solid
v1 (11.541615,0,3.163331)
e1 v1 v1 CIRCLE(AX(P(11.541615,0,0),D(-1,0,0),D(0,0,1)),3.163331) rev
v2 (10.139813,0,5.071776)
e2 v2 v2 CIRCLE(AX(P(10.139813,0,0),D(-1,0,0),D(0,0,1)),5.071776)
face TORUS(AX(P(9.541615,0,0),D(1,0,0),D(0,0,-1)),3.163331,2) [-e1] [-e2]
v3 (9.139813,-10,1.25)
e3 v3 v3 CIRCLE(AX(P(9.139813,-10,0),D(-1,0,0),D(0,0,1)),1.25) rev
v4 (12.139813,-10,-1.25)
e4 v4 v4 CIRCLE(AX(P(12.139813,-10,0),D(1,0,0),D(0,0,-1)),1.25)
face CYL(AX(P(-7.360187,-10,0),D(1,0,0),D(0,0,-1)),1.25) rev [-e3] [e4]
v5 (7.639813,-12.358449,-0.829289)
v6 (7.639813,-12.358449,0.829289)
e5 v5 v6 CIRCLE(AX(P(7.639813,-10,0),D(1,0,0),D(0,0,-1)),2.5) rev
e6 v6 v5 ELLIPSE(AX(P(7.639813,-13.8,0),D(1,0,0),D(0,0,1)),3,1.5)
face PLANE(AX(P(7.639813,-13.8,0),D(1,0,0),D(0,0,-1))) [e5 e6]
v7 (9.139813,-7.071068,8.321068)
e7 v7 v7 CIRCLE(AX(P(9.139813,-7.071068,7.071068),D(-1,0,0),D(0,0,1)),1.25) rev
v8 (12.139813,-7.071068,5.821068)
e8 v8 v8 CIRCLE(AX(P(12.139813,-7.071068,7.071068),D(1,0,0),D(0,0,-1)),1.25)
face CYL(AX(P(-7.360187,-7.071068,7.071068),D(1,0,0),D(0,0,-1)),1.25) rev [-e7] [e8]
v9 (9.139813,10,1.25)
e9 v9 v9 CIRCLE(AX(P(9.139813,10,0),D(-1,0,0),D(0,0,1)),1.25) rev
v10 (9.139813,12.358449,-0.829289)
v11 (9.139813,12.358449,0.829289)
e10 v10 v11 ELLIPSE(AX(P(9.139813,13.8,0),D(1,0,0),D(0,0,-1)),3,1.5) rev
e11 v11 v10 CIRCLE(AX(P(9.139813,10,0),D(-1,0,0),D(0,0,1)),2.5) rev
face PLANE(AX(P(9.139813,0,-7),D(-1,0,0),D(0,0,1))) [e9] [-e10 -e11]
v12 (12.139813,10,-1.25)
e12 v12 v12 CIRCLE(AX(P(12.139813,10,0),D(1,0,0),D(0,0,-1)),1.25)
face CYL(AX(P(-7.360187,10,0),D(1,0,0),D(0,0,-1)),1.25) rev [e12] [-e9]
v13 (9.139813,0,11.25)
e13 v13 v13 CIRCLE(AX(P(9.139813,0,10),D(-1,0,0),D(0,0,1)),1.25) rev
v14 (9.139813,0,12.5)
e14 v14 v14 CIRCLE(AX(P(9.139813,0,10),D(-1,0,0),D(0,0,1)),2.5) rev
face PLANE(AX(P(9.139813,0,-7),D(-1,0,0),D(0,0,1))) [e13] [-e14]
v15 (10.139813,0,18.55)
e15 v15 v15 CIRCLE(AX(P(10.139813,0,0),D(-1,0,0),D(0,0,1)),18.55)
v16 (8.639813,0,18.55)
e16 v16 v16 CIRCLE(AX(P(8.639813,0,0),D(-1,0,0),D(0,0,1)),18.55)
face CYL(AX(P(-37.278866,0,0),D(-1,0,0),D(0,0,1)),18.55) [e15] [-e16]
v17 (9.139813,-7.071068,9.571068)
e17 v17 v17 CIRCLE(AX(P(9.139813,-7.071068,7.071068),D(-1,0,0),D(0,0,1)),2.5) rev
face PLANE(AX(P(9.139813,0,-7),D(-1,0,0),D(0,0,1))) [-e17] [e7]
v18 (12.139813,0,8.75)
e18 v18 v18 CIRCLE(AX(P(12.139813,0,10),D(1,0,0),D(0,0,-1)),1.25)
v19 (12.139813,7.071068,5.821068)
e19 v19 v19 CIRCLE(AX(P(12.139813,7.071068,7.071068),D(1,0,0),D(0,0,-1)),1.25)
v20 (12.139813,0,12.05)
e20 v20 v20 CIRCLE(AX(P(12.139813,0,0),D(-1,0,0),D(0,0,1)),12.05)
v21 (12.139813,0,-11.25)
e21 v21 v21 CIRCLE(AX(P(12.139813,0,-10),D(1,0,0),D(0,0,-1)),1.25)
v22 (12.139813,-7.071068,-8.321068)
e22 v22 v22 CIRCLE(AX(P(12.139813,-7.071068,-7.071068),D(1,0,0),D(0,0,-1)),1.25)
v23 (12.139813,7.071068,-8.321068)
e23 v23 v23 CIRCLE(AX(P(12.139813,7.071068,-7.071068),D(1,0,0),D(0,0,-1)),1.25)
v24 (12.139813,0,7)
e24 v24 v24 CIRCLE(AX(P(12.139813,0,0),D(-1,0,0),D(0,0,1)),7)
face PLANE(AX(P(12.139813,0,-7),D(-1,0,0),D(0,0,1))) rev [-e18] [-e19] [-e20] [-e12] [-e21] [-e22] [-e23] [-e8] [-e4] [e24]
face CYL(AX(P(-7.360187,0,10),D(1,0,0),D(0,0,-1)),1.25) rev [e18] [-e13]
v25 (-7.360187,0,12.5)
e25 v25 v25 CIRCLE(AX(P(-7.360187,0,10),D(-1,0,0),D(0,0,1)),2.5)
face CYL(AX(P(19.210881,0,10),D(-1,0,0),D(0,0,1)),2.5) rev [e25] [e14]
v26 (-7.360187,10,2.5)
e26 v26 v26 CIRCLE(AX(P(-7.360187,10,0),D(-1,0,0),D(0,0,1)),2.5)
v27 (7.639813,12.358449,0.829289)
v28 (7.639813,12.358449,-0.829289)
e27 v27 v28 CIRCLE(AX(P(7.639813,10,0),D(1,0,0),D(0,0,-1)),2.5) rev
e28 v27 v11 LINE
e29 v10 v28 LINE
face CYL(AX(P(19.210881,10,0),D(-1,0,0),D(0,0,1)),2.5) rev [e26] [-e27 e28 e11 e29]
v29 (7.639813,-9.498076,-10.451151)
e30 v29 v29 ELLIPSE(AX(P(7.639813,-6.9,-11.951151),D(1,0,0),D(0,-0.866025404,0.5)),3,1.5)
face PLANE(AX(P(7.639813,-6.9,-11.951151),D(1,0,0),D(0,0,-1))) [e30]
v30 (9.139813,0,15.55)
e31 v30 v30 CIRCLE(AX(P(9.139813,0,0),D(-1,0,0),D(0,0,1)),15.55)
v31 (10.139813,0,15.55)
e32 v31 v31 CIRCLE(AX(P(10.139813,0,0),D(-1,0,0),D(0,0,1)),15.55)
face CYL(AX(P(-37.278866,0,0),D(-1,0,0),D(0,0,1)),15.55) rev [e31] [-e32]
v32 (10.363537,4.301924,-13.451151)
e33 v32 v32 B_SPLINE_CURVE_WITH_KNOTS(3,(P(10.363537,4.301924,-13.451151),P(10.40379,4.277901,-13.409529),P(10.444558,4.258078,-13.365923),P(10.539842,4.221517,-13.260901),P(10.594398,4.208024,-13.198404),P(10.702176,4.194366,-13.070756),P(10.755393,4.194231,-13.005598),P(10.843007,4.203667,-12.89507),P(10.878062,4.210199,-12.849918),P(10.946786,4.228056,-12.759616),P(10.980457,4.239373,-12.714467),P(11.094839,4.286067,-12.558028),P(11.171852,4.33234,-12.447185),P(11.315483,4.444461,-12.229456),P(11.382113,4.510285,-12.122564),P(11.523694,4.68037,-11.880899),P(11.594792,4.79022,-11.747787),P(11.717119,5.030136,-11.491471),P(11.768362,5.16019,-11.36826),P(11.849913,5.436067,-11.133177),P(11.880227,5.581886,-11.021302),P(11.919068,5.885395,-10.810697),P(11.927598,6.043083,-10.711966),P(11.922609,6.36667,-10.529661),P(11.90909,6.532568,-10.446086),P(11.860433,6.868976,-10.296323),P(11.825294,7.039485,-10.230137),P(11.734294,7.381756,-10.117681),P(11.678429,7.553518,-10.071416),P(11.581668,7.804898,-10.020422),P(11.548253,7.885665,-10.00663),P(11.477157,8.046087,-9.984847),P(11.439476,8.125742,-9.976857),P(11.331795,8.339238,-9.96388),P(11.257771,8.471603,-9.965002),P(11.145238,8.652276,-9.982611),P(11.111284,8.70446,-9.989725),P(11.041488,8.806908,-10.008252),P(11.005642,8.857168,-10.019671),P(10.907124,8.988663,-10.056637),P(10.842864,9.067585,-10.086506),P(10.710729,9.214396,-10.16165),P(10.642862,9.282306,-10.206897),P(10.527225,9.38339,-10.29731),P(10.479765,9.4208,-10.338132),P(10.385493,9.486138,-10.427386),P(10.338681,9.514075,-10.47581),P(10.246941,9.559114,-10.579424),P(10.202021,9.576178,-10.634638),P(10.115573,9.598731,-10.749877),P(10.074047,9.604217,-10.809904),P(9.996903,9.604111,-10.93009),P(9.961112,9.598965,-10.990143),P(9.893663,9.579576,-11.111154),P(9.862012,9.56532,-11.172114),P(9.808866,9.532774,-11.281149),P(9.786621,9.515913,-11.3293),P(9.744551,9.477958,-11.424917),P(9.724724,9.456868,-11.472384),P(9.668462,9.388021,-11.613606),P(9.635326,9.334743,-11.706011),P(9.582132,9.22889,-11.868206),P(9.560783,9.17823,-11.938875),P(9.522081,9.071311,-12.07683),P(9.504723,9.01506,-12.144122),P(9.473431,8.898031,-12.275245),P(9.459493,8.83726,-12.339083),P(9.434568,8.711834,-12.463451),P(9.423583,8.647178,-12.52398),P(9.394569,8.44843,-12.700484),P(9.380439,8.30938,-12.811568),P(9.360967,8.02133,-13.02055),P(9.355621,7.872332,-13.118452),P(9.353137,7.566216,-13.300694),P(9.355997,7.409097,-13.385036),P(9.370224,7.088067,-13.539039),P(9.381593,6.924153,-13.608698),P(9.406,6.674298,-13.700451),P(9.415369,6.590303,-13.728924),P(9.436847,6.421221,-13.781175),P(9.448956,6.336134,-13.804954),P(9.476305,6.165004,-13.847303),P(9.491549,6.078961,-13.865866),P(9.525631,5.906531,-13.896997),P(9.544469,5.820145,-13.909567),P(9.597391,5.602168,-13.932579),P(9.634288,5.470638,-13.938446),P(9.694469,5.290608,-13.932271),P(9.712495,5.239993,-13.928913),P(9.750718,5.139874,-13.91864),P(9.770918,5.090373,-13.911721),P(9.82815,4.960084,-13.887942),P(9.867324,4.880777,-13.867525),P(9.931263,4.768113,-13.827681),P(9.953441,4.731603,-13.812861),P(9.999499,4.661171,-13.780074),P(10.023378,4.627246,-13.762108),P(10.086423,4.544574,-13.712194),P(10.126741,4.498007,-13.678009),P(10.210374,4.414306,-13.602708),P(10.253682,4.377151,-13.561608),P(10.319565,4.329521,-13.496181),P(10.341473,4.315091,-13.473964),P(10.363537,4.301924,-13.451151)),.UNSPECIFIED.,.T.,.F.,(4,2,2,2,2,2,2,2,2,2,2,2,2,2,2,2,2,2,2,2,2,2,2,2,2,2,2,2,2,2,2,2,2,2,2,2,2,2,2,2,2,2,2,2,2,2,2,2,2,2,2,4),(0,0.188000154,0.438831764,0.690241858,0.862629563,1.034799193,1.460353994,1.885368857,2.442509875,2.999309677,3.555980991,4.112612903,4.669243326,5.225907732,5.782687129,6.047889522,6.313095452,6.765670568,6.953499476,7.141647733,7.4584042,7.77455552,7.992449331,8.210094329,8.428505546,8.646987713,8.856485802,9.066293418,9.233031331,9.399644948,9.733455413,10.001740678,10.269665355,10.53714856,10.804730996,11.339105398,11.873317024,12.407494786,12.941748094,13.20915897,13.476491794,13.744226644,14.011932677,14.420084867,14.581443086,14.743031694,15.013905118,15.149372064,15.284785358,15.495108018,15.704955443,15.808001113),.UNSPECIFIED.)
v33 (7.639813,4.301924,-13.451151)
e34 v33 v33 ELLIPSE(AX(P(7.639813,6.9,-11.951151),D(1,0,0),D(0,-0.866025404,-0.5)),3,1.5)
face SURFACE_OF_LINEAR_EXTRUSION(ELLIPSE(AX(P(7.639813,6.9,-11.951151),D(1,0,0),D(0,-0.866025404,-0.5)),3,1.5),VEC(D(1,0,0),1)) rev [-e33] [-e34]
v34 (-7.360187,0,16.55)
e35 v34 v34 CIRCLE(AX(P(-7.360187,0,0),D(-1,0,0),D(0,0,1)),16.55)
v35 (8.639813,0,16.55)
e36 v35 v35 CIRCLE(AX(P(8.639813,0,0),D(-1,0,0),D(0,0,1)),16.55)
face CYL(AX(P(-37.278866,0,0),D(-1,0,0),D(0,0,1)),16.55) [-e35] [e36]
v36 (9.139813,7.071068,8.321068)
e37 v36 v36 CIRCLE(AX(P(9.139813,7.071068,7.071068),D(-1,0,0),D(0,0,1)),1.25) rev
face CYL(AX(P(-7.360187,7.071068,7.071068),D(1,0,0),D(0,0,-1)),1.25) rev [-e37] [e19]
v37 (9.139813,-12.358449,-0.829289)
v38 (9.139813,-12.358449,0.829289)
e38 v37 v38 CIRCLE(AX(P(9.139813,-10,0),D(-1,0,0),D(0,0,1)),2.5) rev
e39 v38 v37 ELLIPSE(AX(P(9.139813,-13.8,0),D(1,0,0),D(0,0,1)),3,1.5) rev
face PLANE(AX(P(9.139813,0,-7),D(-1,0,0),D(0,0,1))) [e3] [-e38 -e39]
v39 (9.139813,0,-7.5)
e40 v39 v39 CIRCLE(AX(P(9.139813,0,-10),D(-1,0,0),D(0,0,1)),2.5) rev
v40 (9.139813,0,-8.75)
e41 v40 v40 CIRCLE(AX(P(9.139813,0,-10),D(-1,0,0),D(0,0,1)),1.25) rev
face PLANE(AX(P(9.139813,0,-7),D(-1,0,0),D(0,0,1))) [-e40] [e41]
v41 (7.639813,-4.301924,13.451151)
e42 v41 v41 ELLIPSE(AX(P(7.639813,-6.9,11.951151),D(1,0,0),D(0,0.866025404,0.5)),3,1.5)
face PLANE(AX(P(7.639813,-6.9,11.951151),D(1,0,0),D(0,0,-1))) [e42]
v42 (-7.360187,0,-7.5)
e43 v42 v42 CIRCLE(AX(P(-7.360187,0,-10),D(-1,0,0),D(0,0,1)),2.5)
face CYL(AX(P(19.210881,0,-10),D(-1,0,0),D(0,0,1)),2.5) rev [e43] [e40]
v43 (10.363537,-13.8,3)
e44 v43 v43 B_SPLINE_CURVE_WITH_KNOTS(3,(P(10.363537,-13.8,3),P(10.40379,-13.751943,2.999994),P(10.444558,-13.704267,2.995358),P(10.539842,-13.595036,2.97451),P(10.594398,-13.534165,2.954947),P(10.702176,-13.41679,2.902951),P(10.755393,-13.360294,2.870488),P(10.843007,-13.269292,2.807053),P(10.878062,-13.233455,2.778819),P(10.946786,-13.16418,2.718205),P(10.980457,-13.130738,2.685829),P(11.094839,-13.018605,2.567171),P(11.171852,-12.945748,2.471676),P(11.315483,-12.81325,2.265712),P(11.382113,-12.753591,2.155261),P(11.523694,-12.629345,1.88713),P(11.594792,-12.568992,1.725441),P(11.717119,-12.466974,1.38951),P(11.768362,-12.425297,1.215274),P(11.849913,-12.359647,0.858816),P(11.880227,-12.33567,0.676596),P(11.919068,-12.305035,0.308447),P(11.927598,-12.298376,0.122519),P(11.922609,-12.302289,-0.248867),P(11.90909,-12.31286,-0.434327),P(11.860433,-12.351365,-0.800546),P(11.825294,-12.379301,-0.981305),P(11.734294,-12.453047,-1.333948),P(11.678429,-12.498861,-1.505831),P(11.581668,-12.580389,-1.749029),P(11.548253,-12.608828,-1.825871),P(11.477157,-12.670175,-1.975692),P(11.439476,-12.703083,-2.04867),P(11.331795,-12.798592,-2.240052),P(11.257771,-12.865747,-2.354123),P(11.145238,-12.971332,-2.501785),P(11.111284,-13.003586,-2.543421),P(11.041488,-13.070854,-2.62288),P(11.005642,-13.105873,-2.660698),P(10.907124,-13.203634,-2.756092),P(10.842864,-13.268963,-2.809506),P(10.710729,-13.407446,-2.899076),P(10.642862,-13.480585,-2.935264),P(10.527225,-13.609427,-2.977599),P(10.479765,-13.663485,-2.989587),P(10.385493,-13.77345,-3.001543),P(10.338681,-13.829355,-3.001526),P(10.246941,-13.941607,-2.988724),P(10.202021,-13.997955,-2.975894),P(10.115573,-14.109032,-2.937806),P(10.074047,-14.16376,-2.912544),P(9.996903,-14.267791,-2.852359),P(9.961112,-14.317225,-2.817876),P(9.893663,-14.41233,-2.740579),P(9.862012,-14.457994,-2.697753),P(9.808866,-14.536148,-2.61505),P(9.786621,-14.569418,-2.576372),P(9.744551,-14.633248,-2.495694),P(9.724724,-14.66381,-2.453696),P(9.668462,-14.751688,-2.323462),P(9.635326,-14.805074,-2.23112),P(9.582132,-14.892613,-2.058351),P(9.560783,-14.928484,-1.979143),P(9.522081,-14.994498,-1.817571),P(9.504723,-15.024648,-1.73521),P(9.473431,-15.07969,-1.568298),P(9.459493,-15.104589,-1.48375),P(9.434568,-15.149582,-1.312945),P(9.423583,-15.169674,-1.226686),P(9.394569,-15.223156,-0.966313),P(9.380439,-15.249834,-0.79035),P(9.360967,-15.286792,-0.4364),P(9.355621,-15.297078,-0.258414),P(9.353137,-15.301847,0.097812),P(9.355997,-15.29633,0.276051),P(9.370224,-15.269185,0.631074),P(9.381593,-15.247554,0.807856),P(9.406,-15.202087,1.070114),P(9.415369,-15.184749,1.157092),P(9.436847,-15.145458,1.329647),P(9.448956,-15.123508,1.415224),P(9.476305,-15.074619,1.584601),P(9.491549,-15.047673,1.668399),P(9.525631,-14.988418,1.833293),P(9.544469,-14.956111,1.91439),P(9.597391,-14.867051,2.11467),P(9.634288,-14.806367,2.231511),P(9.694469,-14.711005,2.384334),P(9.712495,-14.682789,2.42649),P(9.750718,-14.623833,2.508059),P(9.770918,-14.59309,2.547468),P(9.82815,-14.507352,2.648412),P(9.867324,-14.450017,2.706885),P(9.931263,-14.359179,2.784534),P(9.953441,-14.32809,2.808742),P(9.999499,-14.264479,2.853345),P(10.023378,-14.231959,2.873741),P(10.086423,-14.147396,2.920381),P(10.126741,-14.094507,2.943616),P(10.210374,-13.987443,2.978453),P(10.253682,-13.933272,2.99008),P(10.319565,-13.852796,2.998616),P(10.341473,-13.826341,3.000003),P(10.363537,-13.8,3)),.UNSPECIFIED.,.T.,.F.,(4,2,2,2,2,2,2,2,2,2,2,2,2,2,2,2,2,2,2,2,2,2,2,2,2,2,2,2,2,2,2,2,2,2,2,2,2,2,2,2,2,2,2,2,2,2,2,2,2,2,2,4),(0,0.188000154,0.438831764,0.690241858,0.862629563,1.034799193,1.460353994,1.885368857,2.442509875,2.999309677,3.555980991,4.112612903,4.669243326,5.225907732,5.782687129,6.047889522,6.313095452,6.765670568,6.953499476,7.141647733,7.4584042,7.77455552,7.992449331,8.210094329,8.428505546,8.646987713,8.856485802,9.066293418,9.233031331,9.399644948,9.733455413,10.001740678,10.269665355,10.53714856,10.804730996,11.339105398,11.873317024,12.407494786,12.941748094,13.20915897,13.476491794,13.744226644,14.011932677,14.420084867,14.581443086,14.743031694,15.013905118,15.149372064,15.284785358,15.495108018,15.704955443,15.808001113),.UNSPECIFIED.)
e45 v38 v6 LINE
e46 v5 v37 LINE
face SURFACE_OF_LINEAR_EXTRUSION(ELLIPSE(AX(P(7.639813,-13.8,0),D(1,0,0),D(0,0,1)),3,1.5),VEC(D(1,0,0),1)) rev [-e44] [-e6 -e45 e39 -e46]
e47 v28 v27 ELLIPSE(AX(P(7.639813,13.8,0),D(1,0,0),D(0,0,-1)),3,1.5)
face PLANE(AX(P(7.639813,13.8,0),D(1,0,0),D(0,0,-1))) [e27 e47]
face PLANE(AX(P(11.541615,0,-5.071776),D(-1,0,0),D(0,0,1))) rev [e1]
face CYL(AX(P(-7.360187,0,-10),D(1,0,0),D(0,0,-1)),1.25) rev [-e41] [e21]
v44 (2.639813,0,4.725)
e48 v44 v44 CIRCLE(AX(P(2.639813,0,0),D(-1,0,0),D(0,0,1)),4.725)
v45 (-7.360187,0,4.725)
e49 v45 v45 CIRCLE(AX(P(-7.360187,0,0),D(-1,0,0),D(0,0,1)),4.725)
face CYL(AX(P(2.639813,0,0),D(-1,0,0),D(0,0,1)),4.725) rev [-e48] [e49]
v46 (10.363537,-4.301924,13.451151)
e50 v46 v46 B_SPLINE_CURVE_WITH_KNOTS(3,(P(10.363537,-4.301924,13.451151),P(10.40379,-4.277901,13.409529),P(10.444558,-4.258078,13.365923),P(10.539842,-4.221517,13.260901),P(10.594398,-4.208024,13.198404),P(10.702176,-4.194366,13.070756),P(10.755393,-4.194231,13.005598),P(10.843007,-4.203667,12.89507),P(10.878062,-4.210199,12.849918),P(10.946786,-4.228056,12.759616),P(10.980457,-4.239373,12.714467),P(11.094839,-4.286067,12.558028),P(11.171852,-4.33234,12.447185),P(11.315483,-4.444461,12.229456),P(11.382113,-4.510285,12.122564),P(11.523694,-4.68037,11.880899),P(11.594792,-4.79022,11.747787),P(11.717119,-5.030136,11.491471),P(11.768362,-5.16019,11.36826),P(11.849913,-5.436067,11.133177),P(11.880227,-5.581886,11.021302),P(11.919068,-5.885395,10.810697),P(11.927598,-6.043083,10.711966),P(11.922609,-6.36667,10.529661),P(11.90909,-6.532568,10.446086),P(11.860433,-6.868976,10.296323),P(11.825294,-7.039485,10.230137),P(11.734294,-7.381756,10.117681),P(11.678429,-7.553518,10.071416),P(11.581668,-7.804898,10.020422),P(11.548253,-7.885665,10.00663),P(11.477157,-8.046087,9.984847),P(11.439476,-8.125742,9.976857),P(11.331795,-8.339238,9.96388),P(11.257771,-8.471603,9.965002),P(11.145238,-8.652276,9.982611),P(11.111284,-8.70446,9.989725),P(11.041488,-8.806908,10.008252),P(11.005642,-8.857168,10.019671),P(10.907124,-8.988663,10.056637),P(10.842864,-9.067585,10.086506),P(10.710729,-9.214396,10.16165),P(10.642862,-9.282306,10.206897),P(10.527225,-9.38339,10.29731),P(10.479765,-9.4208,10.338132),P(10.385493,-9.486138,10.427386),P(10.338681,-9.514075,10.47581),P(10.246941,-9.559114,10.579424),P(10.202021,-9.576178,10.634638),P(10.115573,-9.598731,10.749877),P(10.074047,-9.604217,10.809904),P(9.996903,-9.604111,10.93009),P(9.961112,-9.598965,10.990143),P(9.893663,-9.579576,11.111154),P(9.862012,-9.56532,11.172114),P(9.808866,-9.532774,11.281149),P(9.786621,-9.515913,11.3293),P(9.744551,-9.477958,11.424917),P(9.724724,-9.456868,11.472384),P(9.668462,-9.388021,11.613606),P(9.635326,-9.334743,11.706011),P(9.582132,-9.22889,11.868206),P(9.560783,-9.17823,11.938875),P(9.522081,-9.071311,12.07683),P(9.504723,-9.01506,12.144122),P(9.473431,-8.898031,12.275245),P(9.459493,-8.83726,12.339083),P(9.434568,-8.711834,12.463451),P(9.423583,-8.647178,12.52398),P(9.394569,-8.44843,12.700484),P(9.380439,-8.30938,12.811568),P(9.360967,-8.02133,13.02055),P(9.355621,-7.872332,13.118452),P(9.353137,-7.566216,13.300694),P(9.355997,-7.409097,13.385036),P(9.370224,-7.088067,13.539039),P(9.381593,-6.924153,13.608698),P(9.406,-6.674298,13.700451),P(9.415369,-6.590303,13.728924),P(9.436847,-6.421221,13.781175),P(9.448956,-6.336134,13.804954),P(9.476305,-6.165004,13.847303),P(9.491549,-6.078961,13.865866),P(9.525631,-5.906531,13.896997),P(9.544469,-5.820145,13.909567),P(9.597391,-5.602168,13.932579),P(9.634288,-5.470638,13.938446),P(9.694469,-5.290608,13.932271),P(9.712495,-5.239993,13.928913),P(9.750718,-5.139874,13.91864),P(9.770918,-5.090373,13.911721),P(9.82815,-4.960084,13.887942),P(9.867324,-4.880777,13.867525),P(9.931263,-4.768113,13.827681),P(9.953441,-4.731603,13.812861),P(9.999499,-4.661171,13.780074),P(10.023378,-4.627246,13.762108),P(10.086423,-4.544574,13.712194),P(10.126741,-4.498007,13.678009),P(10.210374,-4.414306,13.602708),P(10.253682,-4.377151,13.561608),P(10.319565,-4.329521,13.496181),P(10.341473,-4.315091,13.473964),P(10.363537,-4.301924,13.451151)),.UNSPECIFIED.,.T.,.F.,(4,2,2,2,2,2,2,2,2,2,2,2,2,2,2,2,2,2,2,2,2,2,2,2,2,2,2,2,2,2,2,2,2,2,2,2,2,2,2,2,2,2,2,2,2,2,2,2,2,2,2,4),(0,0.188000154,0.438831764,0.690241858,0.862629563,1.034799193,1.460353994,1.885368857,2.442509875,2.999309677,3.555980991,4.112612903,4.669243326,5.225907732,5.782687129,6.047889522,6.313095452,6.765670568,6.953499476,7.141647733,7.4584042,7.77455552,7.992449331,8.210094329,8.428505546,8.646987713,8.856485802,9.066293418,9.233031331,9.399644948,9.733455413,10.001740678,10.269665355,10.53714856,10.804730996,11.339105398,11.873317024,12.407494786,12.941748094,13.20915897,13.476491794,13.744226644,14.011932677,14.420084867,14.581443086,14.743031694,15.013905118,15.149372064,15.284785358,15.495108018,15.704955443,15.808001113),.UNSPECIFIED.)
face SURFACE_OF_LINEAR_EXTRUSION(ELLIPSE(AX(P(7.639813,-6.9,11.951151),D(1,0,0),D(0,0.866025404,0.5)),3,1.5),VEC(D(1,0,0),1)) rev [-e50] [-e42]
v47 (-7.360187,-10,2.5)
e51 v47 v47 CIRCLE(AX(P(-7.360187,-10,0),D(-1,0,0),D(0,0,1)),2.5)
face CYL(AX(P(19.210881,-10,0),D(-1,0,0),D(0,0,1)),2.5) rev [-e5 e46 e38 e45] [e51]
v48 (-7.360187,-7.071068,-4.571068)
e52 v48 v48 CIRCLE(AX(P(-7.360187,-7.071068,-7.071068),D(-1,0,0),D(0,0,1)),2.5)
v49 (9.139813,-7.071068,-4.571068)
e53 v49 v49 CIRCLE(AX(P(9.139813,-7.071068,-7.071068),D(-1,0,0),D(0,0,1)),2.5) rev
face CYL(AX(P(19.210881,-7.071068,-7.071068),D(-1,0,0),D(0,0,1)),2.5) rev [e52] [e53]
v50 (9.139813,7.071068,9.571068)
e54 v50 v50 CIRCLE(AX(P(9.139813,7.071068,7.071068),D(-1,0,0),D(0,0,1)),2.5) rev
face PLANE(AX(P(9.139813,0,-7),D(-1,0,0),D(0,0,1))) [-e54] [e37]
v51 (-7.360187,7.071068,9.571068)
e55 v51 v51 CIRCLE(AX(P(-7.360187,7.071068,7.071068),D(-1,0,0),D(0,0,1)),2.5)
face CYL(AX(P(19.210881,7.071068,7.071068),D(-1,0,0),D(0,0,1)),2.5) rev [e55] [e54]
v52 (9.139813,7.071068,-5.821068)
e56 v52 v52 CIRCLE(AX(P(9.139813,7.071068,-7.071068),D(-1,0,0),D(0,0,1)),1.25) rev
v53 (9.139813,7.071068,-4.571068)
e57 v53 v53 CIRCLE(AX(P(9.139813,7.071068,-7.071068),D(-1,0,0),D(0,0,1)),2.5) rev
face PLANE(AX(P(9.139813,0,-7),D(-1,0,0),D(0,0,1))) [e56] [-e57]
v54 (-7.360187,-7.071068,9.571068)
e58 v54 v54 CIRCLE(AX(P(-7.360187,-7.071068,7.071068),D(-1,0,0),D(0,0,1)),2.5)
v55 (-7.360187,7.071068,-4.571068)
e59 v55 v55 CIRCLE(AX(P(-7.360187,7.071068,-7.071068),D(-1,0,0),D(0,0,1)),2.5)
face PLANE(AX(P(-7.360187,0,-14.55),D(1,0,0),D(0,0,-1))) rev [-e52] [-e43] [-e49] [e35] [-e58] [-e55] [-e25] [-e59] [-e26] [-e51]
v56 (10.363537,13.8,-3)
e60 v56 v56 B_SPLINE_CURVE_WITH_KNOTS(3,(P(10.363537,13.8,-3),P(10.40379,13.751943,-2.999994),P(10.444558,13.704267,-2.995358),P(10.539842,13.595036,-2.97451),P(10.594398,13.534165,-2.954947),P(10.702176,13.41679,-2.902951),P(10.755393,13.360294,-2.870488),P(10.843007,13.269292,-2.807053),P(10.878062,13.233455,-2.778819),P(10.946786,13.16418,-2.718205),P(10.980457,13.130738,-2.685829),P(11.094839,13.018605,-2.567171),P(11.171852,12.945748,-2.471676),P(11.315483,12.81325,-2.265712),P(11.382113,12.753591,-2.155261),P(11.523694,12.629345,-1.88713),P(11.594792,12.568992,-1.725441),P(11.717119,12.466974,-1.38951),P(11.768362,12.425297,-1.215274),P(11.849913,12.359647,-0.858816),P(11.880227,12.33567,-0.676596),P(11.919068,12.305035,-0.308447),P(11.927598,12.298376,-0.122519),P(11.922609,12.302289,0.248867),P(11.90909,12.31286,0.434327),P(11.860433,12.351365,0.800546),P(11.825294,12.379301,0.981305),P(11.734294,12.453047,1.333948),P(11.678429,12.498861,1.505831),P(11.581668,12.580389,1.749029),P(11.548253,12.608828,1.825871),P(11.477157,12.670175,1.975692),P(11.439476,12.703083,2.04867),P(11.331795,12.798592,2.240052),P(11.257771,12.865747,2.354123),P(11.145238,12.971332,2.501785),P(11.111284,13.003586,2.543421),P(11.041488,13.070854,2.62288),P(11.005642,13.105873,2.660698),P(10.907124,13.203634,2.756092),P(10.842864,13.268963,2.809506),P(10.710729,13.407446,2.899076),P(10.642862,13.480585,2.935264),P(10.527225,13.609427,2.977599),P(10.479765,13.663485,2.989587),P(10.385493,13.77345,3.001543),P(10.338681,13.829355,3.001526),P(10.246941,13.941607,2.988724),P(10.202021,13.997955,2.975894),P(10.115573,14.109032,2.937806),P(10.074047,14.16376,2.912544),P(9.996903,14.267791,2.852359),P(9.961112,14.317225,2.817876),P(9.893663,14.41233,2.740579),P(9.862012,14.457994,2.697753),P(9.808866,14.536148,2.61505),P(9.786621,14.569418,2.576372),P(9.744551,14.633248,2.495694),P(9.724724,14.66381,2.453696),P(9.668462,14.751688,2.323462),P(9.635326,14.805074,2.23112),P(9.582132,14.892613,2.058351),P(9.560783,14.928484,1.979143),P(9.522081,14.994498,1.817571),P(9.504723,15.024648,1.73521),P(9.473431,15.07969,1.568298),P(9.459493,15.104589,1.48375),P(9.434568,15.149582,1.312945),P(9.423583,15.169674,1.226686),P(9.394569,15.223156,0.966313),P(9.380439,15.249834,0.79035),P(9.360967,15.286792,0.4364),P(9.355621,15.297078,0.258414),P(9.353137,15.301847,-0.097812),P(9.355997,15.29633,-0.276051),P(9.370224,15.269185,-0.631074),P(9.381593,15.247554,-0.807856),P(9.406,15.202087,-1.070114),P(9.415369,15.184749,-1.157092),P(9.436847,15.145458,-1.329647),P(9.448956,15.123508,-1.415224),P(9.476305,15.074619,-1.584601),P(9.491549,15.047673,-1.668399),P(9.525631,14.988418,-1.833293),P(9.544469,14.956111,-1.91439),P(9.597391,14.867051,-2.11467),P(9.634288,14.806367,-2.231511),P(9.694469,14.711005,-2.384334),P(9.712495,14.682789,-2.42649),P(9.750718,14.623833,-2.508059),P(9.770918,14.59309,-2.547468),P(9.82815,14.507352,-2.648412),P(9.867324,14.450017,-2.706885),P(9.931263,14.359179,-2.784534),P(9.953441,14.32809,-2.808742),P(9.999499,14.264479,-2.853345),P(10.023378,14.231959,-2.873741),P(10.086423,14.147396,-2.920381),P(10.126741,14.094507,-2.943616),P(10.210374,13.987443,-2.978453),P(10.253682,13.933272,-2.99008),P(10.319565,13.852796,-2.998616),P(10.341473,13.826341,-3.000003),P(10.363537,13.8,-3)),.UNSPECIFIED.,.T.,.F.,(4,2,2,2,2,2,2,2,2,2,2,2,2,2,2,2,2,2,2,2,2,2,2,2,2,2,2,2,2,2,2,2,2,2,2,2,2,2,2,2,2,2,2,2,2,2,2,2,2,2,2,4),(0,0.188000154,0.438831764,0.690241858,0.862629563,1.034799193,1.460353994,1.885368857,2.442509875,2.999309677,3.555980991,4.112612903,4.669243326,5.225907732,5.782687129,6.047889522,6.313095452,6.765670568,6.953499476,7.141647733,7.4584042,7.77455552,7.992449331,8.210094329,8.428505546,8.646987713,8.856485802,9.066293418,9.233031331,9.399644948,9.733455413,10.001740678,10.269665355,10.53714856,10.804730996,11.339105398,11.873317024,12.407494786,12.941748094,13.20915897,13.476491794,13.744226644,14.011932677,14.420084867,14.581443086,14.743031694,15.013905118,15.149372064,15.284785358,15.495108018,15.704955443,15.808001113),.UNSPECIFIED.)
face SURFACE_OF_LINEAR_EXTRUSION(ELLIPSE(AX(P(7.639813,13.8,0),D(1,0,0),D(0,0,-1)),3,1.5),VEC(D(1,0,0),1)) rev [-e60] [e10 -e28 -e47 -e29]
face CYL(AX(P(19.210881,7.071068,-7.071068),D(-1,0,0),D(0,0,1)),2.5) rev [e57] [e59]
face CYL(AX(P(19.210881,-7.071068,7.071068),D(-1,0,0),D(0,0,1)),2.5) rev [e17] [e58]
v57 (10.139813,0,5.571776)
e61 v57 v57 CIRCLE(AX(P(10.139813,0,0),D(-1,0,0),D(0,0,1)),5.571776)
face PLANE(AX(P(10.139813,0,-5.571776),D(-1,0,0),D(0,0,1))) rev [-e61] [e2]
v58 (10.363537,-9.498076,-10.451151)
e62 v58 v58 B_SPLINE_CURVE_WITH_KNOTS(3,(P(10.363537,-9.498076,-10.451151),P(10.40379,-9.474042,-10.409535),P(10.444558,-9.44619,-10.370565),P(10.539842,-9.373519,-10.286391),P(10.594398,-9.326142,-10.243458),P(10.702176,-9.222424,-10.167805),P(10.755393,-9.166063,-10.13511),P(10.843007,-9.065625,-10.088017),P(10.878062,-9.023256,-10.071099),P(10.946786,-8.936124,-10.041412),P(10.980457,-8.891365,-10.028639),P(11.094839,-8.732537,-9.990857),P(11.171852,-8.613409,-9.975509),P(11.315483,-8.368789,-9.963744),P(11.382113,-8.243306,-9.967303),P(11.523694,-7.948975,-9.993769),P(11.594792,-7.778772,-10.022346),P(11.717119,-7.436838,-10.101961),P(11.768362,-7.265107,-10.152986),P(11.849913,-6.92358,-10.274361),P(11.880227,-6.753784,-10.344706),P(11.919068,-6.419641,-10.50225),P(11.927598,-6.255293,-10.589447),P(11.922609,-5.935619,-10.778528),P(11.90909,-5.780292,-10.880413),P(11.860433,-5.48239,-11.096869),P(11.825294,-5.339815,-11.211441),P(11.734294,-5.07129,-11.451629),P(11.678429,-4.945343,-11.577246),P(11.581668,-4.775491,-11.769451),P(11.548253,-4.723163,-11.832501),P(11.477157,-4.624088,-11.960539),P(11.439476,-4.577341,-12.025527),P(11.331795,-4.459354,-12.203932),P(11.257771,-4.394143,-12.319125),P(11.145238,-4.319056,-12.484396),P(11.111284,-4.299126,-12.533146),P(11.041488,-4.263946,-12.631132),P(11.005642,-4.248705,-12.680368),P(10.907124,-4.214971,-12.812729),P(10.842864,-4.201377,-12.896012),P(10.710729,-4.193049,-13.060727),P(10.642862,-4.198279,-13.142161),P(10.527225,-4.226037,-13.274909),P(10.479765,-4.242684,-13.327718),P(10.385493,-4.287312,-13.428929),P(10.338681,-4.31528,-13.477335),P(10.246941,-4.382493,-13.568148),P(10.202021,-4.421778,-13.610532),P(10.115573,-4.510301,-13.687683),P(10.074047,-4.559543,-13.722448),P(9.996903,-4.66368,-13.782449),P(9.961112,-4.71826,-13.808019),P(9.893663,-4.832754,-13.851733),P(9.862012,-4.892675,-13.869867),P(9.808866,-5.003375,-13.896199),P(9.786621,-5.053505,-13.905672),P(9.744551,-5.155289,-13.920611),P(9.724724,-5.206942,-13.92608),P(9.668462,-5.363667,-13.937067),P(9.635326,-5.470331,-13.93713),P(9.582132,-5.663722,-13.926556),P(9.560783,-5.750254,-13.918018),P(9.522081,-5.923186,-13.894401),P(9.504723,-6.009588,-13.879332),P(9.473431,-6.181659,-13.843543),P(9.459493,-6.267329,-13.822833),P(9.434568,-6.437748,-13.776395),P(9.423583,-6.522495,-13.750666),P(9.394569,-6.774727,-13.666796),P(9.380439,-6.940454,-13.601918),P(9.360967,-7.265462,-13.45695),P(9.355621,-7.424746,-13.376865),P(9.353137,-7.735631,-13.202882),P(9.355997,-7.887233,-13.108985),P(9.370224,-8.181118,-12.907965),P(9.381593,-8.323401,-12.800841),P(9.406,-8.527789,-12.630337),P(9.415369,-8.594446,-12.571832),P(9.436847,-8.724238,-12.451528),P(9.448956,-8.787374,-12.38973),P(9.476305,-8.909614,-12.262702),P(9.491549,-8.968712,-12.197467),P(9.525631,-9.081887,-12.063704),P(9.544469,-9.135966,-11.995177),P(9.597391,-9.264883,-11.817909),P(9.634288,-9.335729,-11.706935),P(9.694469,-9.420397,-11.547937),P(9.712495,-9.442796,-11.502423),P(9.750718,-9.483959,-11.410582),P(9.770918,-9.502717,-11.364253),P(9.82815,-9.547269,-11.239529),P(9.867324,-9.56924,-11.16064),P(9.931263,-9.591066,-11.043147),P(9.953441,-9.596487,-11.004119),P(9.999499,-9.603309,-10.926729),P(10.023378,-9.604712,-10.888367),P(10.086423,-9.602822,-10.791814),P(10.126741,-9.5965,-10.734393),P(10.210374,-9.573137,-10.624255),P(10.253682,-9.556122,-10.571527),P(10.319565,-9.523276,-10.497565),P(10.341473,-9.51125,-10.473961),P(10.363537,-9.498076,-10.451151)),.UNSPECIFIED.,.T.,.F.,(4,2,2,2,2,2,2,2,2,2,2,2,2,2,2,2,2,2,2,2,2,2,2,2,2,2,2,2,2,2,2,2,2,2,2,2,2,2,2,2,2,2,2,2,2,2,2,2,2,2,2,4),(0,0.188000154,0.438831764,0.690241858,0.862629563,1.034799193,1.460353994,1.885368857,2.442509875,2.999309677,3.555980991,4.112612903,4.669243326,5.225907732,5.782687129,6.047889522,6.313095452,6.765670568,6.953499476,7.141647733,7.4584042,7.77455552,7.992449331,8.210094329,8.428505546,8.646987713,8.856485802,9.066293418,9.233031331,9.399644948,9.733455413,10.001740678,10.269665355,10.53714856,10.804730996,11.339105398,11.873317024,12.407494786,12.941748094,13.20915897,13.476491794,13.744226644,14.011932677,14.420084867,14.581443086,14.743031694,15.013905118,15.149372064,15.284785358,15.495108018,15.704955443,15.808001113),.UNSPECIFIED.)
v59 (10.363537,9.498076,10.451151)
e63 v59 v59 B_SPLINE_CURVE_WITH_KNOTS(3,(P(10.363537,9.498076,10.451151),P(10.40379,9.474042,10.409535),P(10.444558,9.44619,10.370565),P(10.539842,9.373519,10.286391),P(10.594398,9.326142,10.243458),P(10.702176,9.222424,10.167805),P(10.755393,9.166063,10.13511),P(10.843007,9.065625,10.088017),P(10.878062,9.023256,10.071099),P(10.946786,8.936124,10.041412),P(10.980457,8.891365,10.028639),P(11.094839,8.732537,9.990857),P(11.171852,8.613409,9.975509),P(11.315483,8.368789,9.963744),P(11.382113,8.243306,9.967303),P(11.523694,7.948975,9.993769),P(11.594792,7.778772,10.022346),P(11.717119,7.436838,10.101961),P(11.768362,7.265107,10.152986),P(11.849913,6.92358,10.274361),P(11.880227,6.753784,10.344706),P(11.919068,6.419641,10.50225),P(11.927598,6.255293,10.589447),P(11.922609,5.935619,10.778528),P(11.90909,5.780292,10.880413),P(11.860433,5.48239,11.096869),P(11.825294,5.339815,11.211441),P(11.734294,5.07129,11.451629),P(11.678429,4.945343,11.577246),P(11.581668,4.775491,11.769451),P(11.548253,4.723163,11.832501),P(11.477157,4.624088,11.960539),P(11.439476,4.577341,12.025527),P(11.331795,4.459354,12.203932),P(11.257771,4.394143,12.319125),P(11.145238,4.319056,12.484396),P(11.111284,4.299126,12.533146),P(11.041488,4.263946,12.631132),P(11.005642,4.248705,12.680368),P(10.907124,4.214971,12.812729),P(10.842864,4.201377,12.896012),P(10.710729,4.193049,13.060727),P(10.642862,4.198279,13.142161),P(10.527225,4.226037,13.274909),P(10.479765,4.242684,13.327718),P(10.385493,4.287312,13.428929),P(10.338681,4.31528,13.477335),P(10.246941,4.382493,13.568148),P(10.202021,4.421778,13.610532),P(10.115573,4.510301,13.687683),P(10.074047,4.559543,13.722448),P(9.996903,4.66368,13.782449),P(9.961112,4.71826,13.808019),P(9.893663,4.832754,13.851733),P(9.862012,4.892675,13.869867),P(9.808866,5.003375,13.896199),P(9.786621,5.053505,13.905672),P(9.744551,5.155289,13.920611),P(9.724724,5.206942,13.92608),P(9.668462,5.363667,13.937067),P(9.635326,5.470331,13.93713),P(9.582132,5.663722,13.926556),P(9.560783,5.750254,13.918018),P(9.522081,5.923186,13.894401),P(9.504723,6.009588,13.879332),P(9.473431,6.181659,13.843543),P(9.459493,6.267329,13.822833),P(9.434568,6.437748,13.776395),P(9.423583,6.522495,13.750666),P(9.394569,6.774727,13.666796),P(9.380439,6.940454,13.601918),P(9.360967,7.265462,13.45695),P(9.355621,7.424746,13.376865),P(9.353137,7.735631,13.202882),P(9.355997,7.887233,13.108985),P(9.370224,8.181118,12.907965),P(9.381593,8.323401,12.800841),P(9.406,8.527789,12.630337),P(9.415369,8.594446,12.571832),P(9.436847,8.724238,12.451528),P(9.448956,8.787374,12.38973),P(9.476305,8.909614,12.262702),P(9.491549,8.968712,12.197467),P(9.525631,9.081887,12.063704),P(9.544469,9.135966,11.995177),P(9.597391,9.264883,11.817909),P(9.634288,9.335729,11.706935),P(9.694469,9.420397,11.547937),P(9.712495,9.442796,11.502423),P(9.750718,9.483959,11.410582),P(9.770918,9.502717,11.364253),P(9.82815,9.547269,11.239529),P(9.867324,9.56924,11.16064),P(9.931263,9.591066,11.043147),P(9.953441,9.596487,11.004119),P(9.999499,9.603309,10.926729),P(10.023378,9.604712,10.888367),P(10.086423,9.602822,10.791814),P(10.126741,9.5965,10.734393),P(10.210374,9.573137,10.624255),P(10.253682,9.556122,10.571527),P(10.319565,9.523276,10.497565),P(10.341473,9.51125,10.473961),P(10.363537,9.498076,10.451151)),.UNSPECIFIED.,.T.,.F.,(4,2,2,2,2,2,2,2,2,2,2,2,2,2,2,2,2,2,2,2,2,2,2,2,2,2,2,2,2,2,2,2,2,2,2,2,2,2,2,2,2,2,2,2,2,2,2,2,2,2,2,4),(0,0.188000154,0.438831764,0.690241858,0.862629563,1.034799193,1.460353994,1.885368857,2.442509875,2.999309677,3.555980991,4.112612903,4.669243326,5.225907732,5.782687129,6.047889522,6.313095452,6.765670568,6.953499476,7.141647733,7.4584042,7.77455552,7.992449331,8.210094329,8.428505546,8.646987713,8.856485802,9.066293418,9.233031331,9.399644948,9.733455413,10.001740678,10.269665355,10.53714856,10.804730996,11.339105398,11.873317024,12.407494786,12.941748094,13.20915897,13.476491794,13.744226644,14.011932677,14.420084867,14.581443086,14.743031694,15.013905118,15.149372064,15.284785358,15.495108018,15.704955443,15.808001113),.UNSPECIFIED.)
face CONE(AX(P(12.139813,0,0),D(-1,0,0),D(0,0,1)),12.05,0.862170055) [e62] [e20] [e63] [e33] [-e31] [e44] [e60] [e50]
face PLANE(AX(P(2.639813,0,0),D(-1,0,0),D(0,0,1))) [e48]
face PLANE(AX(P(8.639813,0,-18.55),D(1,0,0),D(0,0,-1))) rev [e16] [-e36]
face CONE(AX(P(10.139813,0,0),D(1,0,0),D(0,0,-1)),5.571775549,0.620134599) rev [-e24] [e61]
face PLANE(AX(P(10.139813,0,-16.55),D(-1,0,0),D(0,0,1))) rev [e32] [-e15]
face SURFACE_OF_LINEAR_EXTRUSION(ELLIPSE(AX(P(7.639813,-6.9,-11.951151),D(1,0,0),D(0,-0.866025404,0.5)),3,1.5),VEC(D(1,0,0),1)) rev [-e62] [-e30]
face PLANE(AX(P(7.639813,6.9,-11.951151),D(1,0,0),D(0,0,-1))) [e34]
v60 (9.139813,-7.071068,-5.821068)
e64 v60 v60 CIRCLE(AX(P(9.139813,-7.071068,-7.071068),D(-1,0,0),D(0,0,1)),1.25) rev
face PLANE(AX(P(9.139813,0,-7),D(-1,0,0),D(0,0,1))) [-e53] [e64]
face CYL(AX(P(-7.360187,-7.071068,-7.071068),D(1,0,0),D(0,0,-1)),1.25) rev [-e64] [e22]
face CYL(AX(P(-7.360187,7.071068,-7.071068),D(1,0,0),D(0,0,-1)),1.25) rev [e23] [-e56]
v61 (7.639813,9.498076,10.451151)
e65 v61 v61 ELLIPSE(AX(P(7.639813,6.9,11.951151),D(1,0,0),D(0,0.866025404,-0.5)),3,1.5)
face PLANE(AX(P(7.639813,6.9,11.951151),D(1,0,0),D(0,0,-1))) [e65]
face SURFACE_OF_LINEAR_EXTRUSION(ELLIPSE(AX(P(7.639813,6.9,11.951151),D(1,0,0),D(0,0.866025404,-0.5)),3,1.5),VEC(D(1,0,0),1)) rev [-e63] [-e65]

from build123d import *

# Parameters (mm, degrees)
SKETCH2_R          = 1.25
CUT_EXTRUDE1_DEPTH = 33.687229922
SKETCH3_R          = 2.5
CUT_EXTRUDE2_DEPTH = 16.5
SKETCH7_R          = 4.725
CUT_EXTRUDE7_DEPTH = 10
FILLET1_R          = 2
SKETCH8_RX         = 3
SKETCH8_RY         = 1.5
CUT_EXTRUDE8_DEPTH = 2.5
SKETCH4_R          = 1.25
CUT_EXTRUDE5_DEPTH = 5


with BuildPart() as part:
    # Sketch1 → Revolve1 (revolve)
    with BuildSketch(Plane(origin=(0, 0, 0), x_dir=(1, 0, 0), z_dir=(0, 1, 0)), mode=Mode.PRIVATE) as revolve1_sk:
        Polygon((12.139813159, 7), (12.139813159, 12.05), (9.139813159, 15.55), (10.139813159, 15.55), (10.139813159, 16.55), (10.139813159, 18.55), (8.639813159, 18.55), (8.639813159, 16.55), (-7.360186841, 16.55), (-7.360186841, 14.55), (-7.360186841, 0), (11.541615212, 0), (11.541615212, 5.071775549), (10.139813159, 5.071775549), (10.139813159, 5.571775549), align=None)
    revolve(revolve1_sk.sketch.rotate(Axis((-37.278866169, 0, 0), (1, 0, 0)), 180), axis=Axis((-37.278866169, 0, 0), (1, 0, 0)))

    # Sketch2 → Cut-Extrude1 (cut, through all)
    with BuildSketch(Plane(origin=(12.139813159, 0, 0), x_dir=(0, 0, -1), z_dir=(1, 0, 0))):
        with Locations((0, 10)):
            Circle(SKETCH2_R)
        with Locations((7.071067812, 7.071067812)):
            Circle(SKETCH2_R)
        with Locations((10, 0)):
            Circle(SKETCH2_R)
        with Locations((7.071067812, -7.071067812)):
            Circle(SKETCH2_R)
        with Locations((0, -10)):
            Circle(SKETCH2_R)
        with Locations((-7.071067812, -7.071067812)):
            Circle(SKETCH2_R)
        with Locations((-10, 0)):
            Circle(SKETCH2_R)
        with Locations((-7.071067812, 7.071067812)):
            Circle(SKETCH2_R)
    extrude(amount=-CUT_EXTRUDE1_DEPTH, mode=Mode.SUBTRACT)

    # Sketch3 → Cut-Extrude2 (cut)
    with BuildSketch(Plane.ZY.offset(7.360186841)):
        with Locations((0, 10)):
            Circle(SKETCH3_R)
        with Locations((7.071067812, 7.071067812)):
            Circle(SKETCH3_R)
        with Locations((10, 0)):
            Circle(SKETCH3_R)
        with Locations((7.071067812, -7.071067812)):
            Circle(SKETCH3_R)
        with Locations((0, -10)):
            Circle(SKETCH3_R)
        with Locations((-7.071067812, -7.071067812)):
            Circle(SKETCH3_R)
        with Locations((-10, 0)):
            Circle(SKETCH3_R)
        with Locations((-7.071067812, 7.071067812)):
            Circle(SKETCH3_R)
    extrude(amount=-CUT_EXTRUDE2_DEPTH, mode=Mode.SUBTRACT)

    # Sketch7 → Cut-Extrude7 (cut)
    with BuildSketch(Plane.ZY.offset(7.360186841)):
        Circle(SKETCH7_R)
    extrude(amount=-CUT_EXTRUDE7_DEPTH, mode=Mode.SUBTRACT)

    # Fillet1
    # the kernel refuses this fillet: 2 mm, written as the material it takes off along each edge
    with BuildSketch(Plane(origin=(11.541615212, 0, 0), x_dir=(0, 0, 1), z_dir=(0, 1, 0))) as fillet1_piece_1:
        with BuildLine():
            CenterArc((3.163331362, -2), FILLET1_R, 17.403493434, 72.596506566)
            Line((3.163331362, 0), (3.163331362, 0.04))
            Line((3.163331362, 0.04), (5.071775549, 0.04))
            Line((5.071775549, 0.04), (5.111775549, 0))
            ThreePointArc((5.111775549, 0), (5.111775549, -0.700901026), (5.109944433, -1.389838094))
            Line((5.109944433, -1.389838094), (5.071775549, -1.401802053))
        make_face()
    revolve(axis=Axis((11.541615212, 0, 0), (1, 0, 0)), mode=Mode.SUBTRACT)

    # Sketch8 → Cut-Extrude8 (cut, symmetric)
    with BuildSketch(Plane(origin=(10.139813159, 0, 0), x_dir=(0, 0, -1), z_dir=(1, 0, 0))):
        with Locations((0, 13.8)):
            Ellipse(SKETCH8_RX, SKETCH8_RY)
        with Locations(Location((11.951150572, 6.9), (0, 0, 120))):
            Ellipse(SKETCH8_RX, SKETCH8_RY)
        with Locations(Location((11.951150572, -6.9), (0, 0, -120))):
            Ellipse(SKETCH8_RX, SKETCH8_RY)
        with Locations(Location((0, -13.8), (0, 0, 180))):
            Ellipse(SKETCH8_RX, SKETCH8_RY)
        with Locations(Location((-11.951150572, -6.9), (0, 0, 120))):
            Ellipse(SKETCH8_RX, SKETCH8_RY)
        with Locations(Location((-11.951150572, 6.9), (0, 0, -120))):
            Ellipse(SKETCH8_RX, SKETCH8_RY)
    extrude(amount=CUT_EXTRUDE8_DEPTH, both=True, mode=Mode.SUBTRACT)

    # Sketch4 → Cut-Extrude5 (cut)
    with BuildSketch(Plane(origin=(13.139813159, 0, 0), x_dir=(0, 0, -1), z_dir=(1, 0, 0))):
        with Locations((0, 13.75)):
            Circle(SKETCH4_R)
    extrude(amount=-CUT_EXTRUDE5_DEPTH, mode=Mode.SUBTRACT)


solid = part.part
